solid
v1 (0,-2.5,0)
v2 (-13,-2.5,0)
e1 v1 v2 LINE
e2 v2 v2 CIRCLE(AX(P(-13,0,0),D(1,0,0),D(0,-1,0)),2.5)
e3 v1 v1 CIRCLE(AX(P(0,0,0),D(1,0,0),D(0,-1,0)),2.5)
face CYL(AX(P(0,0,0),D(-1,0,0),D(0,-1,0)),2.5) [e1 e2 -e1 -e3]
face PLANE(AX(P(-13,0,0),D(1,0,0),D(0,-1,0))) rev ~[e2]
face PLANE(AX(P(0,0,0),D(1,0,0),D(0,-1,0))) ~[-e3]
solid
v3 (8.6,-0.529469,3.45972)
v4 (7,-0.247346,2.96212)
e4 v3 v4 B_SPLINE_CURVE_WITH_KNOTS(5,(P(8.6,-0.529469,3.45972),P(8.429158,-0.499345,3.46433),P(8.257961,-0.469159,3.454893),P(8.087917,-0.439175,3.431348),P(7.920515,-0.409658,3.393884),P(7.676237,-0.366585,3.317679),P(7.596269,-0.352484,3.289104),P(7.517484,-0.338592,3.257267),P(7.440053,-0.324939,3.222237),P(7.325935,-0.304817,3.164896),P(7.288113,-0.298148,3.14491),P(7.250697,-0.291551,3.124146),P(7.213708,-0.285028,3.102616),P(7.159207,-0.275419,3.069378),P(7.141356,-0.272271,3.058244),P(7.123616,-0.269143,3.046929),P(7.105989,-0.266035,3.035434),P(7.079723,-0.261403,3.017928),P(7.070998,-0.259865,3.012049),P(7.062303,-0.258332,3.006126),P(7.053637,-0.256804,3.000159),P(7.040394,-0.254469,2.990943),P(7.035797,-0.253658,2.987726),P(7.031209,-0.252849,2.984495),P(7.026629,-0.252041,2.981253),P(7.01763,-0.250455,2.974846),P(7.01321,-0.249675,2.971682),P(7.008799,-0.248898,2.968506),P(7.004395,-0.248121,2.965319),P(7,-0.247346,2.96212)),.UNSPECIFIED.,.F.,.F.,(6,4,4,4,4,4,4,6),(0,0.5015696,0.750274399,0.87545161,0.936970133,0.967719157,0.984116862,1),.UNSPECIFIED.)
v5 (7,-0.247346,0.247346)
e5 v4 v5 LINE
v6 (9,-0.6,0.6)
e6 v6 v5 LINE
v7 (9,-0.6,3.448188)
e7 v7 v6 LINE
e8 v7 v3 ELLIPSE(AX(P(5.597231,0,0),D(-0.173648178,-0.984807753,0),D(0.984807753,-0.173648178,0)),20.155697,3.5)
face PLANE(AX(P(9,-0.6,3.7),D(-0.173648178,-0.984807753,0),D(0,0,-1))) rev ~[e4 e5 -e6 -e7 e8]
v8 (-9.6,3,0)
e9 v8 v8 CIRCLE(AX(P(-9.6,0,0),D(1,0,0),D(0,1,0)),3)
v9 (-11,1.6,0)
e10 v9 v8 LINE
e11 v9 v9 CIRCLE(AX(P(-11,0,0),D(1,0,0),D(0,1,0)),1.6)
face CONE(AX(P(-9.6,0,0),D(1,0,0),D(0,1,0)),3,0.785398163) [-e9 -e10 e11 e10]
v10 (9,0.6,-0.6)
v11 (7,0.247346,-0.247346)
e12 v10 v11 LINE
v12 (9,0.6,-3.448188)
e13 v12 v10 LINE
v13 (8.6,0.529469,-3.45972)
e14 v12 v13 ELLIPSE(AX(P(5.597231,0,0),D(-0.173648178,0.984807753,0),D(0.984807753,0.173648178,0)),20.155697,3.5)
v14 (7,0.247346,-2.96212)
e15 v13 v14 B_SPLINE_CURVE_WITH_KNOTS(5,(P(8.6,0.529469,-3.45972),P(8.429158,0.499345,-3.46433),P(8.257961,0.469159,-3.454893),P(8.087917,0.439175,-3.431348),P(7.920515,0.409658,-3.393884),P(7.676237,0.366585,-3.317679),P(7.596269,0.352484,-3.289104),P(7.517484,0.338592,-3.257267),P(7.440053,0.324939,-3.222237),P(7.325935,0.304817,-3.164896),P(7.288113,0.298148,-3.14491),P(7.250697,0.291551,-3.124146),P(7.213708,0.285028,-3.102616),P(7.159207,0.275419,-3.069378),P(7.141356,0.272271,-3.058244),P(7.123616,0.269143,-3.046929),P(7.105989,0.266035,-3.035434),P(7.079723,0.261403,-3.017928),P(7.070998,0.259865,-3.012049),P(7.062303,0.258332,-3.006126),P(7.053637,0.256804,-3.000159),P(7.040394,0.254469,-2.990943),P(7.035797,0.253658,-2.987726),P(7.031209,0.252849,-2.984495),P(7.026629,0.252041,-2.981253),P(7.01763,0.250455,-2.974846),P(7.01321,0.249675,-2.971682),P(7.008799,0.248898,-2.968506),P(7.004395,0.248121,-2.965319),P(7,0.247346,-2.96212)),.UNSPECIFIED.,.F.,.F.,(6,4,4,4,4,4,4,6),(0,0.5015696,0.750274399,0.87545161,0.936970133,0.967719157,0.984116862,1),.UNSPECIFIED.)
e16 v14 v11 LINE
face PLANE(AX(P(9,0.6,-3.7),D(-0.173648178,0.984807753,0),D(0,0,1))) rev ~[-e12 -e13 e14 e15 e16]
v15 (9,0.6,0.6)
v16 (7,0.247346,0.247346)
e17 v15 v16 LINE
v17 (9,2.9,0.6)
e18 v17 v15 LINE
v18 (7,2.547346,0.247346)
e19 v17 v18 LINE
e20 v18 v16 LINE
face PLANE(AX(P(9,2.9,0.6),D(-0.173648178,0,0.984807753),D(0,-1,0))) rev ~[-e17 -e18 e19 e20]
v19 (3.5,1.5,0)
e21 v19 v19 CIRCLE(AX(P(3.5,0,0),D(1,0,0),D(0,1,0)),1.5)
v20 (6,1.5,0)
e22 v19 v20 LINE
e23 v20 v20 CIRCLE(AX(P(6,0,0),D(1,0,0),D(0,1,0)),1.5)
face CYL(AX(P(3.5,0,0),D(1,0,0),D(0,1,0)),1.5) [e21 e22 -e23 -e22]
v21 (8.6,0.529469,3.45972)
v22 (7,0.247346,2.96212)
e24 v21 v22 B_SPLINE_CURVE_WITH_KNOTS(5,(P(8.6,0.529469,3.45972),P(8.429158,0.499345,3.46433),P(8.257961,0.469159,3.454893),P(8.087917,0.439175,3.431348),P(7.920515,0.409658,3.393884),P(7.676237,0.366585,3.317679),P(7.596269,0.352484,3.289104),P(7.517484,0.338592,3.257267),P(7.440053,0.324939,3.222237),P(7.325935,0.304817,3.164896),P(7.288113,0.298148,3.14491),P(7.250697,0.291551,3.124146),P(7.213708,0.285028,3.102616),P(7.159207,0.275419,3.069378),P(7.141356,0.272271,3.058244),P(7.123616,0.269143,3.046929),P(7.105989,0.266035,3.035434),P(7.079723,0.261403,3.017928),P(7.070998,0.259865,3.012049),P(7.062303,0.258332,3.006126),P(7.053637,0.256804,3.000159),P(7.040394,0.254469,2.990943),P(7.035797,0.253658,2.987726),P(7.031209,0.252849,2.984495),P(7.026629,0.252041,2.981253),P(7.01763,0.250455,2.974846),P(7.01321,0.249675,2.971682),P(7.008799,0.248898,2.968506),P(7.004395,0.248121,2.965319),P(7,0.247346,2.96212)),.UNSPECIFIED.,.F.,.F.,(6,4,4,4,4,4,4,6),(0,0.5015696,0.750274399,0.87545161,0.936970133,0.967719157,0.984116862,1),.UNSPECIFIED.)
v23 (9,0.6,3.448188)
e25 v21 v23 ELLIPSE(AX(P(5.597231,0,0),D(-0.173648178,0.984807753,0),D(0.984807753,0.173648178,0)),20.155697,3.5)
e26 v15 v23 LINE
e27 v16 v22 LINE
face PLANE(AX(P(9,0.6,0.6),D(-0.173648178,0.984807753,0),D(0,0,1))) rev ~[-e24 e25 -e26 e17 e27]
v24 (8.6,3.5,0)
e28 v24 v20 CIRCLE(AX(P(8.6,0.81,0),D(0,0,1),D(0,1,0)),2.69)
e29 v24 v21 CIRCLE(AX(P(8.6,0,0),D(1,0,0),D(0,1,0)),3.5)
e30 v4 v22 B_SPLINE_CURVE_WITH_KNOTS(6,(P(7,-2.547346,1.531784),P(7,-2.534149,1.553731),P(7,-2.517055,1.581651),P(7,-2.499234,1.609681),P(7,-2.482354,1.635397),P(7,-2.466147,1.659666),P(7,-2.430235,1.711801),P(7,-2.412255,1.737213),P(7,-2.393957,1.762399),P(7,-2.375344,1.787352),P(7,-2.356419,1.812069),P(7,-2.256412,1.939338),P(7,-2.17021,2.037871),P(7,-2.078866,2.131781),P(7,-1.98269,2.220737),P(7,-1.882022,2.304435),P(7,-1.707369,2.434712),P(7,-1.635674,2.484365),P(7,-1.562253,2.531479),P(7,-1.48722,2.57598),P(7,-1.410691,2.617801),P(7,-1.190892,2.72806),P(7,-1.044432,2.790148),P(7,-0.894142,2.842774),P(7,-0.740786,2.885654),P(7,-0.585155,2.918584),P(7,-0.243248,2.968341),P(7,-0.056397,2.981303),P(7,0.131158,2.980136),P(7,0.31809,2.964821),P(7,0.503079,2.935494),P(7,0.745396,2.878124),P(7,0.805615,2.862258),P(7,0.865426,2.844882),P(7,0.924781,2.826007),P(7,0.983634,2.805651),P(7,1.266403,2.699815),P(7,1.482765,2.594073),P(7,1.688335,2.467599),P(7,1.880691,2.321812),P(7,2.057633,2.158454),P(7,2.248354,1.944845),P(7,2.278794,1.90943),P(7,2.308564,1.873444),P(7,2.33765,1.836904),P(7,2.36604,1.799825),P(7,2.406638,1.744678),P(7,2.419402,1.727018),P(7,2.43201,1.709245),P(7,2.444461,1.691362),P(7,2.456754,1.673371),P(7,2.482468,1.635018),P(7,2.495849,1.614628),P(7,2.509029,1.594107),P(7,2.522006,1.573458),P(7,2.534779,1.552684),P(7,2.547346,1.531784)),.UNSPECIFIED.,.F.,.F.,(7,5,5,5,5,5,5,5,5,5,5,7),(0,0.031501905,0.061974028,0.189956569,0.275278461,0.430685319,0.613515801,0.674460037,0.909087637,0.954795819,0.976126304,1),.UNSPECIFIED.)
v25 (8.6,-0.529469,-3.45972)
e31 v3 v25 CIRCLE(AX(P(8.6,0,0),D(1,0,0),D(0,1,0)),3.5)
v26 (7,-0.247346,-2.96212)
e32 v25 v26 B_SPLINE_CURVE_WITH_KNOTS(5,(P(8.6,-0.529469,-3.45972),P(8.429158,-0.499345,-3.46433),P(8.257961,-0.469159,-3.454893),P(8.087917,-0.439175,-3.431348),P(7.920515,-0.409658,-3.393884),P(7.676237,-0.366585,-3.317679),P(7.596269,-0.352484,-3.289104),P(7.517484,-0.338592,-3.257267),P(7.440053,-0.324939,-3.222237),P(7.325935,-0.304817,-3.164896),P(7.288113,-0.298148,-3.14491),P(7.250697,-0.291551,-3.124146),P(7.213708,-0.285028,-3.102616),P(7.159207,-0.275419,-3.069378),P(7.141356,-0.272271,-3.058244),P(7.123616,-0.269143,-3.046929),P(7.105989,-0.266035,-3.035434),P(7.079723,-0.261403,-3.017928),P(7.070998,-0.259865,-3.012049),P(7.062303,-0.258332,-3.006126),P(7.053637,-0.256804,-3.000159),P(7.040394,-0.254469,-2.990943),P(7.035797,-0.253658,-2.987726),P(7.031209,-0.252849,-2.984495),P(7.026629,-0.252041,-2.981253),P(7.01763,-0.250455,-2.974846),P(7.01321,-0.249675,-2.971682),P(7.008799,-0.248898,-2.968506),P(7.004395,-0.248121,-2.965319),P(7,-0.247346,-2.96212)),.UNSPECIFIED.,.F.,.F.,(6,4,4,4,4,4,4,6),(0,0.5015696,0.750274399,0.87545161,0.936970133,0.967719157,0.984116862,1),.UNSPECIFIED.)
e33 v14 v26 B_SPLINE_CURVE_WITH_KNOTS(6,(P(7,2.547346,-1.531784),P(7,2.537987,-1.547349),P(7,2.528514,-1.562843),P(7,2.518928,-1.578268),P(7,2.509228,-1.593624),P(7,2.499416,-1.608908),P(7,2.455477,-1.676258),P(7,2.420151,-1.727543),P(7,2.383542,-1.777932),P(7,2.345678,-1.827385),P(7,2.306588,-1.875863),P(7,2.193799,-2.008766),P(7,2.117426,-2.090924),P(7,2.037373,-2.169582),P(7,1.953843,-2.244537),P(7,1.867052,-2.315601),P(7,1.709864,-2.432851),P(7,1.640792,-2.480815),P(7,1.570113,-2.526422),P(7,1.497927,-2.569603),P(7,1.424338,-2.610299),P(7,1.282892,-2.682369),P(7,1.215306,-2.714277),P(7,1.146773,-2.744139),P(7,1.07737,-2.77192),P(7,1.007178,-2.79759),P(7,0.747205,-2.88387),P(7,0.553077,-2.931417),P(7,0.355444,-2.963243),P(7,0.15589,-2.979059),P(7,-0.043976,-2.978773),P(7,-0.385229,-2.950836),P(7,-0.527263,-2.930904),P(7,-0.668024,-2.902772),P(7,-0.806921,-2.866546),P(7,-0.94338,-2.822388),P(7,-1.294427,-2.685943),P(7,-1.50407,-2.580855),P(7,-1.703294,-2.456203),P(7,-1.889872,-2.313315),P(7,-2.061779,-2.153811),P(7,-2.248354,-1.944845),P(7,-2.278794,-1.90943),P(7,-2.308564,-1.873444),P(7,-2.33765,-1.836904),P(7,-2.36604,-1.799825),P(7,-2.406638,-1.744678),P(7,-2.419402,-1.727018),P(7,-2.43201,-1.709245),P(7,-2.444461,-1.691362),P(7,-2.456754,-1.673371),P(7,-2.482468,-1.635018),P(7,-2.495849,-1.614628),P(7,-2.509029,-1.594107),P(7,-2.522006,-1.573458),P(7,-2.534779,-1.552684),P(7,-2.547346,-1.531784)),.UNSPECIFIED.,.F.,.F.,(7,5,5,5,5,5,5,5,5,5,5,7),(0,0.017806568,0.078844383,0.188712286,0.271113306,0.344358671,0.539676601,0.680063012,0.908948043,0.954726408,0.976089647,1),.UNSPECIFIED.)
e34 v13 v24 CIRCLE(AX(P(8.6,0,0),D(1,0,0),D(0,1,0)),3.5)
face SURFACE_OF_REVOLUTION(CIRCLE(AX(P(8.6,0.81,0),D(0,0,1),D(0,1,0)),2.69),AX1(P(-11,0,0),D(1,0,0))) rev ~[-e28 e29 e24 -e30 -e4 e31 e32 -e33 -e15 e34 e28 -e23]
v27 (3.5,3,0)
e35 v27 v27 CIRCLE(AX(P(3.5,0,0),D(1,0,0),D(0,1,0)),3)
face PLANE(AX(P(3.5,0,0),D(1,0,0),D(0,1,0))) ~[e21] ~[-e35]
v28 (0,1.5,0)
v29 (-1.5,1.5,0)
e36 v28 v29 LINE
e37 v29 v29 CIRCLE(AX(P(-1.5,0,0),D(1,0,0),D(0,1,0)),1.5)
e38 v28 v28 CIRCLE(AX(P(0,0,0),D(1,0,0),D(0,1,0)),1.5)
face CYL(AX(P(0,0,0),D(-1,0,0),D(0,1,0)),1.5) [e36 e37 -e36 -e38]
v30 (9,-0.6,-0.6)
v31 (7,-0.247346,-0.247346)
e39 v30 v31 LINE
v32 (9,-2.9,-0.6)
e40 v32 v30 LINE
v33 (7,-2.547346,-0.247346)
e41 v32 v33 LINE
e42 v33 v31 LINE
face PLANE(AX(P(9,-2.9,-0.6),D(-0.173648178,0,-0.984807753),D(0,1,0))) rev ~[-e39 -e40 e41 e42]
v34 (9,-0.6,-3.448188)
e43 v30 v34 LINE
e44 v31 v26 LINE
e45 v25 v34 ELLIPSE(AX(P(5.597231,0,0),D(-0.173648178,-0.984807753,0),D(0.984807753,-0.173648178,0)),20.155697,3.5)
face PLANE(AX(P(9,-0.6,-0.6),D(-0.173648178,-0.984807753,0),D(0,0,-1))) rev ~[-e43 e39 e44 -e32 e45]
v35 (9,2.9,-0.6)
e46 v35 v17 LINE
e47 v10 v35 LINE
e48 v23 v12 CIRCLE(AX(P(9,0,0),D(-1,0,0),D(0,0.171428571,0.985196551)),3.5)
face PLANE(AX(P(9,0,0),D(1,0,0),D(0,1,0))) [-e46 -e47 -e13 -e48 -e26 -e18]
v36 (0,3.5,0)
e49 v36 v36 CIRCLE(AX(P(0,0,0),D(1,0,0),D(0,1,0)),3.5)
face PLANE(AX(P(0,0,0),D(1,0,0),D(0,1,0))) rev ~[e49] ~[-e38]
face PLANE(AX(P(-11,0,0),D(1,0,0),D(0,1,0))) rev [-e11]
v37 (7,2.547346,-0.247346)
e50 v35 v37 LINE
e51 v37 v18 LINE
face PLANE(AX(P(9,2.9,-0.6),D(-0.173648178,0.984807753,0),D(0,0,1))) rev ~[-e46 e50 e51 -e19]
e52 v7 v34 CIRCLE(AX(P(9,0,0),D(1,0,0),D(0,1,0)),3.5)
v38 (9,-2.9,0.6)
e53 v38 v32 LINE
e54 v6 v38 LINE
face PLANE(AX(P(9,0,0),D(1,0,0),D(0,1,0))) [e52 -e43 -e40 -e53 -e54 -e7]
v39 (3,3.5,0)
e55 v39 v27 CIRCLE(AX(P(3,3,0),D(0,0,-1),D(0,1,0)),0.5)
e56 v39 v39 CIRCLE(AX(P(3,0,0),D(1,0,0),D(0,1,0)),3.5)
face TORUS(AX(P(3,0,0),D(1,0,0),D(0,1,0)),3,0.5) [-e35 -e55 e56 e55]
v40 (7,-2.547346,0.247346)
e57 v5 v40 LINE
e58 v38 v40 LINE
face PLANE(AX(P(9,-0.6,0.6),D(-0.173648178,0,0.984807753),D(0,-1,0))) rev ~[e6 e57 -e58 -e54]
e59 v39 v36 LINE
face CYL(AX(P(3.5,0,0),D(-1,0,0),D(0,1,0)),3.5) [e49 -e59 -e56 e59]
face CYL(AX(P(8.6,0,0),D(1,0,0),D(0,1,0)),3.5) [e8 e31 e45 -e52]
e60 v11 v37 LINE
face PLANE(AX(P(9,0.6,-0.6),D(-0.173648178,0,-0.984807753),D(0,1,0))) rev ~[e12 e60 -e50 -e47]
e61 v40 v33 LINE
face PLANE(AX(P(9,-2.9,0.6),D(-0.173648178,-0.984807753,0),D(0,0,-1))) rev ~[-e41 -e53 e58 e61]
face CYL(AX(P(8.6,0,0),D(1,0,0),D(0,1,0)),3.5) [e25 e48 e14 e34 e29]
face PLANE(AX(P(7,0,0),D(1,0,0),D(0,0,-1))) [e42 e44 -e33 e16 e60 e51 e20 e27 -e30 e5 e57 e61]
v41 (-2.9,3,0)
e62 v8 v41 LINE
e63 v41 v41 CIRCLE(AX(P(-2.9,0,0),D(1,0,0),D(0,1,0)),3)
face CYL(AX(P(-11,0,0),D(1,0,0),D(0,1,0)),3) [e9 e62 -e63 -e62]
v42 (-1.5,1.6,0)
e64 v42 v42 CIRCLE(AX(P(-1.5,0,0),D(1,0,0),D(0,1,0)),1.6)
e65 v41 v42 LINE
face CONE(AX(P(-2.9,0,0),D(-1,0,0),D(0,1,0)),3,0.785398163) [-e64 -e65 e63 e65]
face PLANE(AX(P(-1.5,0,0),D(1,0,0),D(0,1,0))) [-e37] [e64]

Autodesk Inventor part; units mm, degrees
ref_plane "YZ Plane" through (0, 0, 0) normal (1, 0, 0) x (0, 1, 0)
ref_plane "XZ Plane" through (0, 0, 0) normal (0, 1, 0) x (-1, 0, 0)
ref_plane "XY Plane" through (0, 0, 0) normal (0, 0, 1) x (1, 0, 0)
sketch "Sketch1" plane through (0, 0, 0) normal (0, 0, 1) x (1, 0, 0)
  line L0 (-19.8, 0) -> (13.8, 0) projected
  line L1 (0, 0) -> (3.5, 0)
  line L2 (3.5, 0) -> (3.5, 3.5)
  line L3 (3.5, 3.5) -> (0, 3.5)
  line L4 (0, 3.5) -> (0, 0)
  line L5 (3.5, 1.5) -> (6, 1.5)
  arc A0 (8.6, 3.5) -> (6, 1.5) centre (8.6, 0.81) ccw
  line L6 (8.6, 3.5) -> (9, 3.5)
  line L7 (9, 3.5) -> (9, 0)
  line L8 (0, 1.5) -> (-1.5, 1.5)
  line L9 (-1.5, 1.5) -> (-1.5, 0)
  line L10 (-1.5, 0) -> (0, 0)
  line L11 (0, 0) -> (0, 1.5)
  line L12 (-11, 3) -> (-1.5, 3)
  line L13 (-1.5, 3) -> (-1.5, 0)
  line L14 (-1.5, 0) -> (-11, 0)
  line L15 (-11, 0) -> (-11, 3)
  point P0 (-11, 0)
  dimension "d0" = 7
  dimension "d1" = 9
  dimension "d2" = 0.4
  dimension "d18" = 3.5
  dimension "d19" = 3
  dimension "d20" = 2.5
  dimension "d21" = 1.5
  dimension "d22" = 6
  dimension "L" = 11
revolve "Revolution1" add sketch "Sketch1" angle 360 about axis through (-10, 0, 0) along (1, 0, 0)
chamfer "Chamfer1" distance 1.4 angle 45 2 edges at (-1.5, -3, 0) (-11, -3, 0)
fillet "Fillet1" radius 0.5 1 edges at (3.5, -3.5, 0)
sketch "Sketch3" plane through (9, 0, 0) normal (1, 0, 0) x (0, 0, -1)
  line L0 (-3.7, 0.6) -> (3.7, 0.6)
  line L1 (3.7, 0.6) -> (3.7, -0.6)
  line L2 (3.7, -0.6) -> (-3.7, -0.6)
  line L3 (-3.7, -0.6) -> (-3.7, 0.6)
  line L4 (-3.7, 0.6) -> (3.7, -0.6) construction
  line L5 (3.7, 0.6) -> (-3.7, -0.6) construction
  line L6 (-0.6, 2.9) -> (0.6, 2.9)
  line L7 (0.6, 2.9) -> (0.6, -2.9)
  line L8 (0.6, -2.9) -> (-0.6, -2.9)
  line L9 (-0.6, -2.9) -> (-0.6, 2.9)
  line L10 (-0.6, 2.9) -> (0.6, -2.9) construction
  line L11 (0.6, 2.9) -> (-0.6, -2.9) construction
  circle A0 centre (0, 0) radius 3.5 construction
  point P0 (-0.6, 3.448188)
  point P1 (-0.6, 0.6)
  point P2 (-3.448188, 0.6)
  point P3 (-3.448188, -0.6)
  point P4 (-0.6, -0.6)
  point P5 (-0.6, -3.448188)
  point P6 (0.6, -3.448188)
  point P7 (0.6, -0.6)
  point P8 (3.448188, -0.6)
  point P9 (3.448188, 0.6)
  point P10 (0.6, 0.6)
  point P11 (0.6, 3.448188)
  dimension "d28" = 1.2
  dimension "d31" = 0.2
  dimension "d32" = 0.6
sketch "Sketch3 outline for Extrusion1" plane through (9, 0, 0) normal (1, 0, 0) x (0, 0, -1)
  line L0 (-0.6, 0.6) -> (-3.7, 0.6)
  line L1 (-3.7, 0.6) -> (-3.7, -0.6)
  line L2 (-3.7, -0.6) -> (-0.6, -0.6)
  line L3 (-0.6, -0.6) -> (-0.6, -2.9)
  line L4 (-0.6, -2.9) -> (0.6, -2.9)
  line L5 (0.6, -2.9) -> (0.6, -0.6)
  line L6 (0.6, -0.6) -> (3.7, -0.6)
  line L7 (3.7, -0.6) -> (3.7, 0.6)
  line L8 (3.7, 0.6) -> (0.6, 0.6)
  line L9 (0.6, 0.6) -> (0.6, 2.9)
  line L10 (0.6, 2.9) -> (-0.6, 2.9)
  line L11 (-0.6, 2.9) -> (-0.6, 0.6)
extrude "Extrusion1" cut sketch "Sketch3 outline for Extrusion1" against normal blind 2 draft -10
thread "Thread1" size "TR8x1.5" class "7e" standard "ISO Metric Trapezoidal Threads" full length
sketch "Sketch4" plane through (0, 0, 0) normal (0, 0, 1) x (1, 0, 0)
  line L0 (-20.4, 0) -> (3.4, 0) projected
  line L1 (-13, 0) -> (0, 0)
  line L2 (0, 0) -> (0, -2.5)
  line L3 (0, -2.5) -> (-13, -2.5)
  line L4 (-13, -2.5) -> (-13, 0)
  line L5 (0, -3.5) -> (0, 3.5) projected
  line L6 (-11, -1.6) -> (-11, 1.6) projected
  point P0 (0, 0)
  point P1 (0, 0)
  dimension "d36" = 2
  dimension "d37" = 5
revolve "Revolution2" add sketch "Sketch4" angle 360 about axis through (-10, 0, 0) along (1, 0, 0) separate body
properties part number "263.20.150" material "Stainless Steel"
